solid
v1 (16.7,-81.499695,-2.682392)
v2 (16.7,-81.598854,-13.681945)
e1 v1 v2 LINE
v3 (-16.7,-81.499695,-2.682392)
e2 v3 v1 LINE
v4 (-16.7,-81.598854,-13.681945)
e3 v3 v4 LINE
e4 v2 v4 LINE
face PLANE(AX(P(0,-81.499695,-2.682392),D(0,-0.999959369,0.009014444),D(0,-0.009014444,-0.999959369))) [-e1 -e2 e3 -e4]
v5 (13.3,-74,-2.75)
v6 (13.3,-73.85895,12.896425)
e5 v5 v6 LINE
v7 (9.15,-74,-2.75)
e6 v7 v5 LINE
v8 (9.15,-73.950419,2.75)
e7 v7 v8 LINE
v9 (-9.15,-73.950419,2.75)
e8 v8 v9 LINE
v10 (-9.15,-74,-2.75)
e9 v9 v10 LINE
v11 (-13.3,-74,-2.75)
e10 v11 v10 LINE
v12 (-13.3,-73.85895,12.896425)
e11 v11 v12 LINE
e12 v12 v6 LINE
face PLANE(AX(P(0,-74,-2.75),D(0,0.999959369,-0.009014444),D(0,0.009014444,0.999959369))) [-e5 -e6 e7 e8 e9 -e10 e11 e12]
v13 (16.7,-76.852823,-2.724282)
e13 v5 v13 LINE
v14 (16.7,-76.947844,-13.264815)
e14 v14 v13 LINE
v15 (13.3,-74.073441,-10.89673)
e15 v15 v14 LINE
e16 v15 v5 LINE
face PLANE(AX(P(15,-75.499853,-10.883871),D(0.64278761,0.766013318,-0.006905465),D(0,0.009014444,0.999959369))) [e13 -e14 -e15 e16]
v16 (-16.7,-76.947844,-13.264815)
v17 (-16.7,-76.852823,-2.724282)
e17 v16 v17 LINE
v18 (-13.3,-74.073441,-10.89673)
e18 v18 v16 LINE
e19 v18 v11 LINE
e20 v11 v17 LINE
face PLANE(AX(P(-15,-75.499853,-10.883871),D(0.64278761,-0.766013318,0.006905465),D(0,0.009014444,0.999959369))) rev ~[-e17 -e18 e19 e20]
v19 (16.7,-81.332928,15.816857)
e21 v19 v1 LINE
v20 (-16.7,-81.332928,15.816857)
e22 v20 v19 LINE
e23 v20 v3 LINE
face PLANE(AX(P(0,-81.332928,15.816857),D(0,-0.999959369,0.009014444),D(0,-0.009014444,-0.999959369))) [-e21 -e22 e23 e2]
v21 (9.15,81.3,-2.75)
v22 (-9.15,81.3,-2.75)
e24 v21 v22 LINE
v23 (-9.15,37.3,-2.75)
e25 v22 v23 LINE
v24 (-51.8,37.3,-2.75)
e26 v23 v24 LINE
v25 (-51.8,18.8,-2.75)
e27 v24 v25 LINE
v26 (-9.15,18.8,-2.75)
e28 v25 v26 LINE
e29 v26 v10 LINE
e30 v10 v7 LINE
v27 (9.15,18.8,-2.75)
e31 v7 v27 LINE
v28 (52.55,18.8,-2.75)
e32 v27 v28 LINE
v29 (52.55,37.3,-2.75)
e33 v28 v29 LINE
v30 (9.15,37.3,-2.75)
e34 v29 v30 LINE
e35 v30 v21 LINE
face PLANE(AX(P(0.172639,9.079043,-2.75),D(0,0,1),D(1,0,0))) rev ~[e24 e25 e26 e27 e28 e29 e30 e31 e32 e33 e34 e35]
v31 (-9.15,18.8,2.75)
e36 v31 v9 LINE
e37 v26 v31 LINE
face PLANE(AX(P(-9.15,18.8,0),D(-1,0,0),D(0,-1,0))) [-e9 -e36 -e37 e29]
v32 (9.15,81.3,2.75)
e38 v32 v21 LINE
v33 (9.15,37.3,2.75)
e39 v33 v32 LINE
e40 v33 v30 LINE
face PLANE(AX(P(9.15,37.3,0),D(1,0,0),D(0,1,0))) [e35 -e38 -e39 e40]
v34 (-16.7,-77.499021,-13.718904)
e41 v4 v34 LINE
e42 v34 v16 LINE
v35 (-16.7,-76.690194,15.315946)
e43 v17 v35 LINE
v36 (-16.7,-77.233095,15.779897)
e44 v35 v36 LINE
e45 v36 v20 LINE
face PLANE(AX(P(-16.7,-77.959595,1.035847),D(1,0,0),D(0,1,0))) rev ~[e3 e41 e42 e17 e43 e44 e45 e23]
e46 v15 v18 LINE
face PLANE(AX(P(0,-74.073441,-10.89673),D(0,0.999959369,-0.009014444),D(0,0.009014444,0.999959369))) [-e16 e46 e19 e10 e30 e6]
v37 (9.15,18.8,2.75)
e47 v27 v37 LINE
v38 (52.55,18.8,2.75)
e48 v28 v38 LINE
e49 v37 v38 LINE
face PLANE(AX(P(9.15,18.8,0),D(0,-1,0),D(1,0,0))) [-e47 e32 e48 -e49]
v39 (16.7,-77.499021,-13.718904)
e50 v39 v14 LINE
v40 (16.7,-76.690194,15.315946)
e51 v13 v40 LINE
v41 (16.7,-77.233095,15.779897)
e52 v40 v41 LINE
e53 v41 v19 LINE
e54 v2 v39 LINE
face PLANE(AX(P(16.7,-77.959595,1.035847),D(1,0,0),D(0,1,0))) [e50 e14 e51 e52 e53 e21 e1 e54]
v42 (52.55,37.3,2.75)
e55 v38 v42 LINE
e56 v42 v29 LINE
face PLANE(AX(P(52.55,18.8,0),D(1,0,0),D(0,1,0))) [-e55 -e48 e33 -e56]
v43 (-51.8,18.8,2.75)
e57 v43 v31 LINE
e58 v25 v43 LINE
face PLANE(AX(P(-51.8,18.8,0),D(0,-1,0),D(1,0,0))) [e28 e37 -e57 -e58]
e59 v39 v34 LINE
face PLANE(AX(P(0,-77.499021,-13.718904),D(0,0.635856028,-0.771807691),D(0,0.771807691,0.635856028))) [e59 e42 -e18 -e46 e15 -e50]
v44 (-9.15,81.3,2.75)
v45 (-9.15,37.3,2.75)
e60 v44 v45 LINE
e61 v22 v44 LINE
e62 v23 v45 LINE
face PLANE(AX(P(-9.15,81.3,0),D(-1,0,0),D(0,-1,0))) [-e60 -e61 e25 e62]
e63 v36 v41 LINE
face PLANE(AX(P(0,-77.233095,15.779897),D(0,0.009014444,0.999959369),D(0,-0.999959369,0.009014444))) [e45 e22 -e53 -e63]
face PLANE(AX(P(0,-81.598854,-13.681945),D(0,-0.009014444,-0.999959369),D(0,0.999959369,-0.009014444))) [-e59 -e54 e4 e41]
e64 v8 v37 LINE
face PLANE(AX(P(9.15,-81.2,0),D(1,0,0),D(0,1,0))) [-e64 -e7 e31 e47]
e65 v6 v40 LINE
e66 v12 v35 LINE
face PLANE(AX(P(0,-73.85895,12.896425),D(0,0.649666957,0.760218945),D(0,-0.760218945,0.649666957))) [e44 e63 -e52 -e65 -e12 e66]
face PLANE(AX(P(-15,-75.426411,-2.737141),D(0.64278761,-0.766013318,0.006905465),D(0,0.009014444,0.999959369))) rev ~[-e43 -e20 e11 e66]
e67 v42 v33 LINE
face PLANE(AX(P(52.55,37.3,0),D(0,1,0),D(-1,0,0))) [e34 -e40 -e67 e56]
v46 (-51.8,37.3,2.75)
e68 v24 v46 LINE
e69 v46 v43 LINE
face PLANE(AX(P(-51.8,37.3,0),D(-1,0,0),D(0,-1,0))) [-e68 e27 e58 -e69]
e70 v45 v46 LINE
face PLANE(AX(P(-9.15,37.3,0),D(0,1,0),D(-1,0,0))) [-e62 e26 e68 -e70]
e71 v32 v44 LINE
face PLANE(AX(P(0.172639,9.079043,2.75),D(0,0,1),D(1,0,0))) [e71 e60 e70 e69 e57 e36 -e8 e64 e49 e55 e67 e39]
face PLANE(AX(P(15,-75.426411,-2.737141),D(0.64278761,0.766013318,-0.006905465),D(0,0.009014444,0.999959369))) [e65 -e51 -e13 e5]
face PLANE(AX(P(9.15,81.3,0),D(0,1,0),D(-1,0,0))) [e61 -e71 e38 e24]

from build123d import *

# Parameters (mm, degrees)
F1_DEPTH    = 2.75
F3_DEPTH    = 16.7
F4_C1_SIZE2 = 2.852938746
F4_C1_SIZE  = 3.4
F4_C2_SIZE2 = 2.852938746
F4_C2_SIZE  = 3.4


with BuildPart() as f1:
    # F0 (on Top) → F1 (new body, symmetric)
    with BuildSketch(Plane.XY):
        Polygon((9.15, 81.3), (0, 81.3), (-9.15, 81.3), (-9.15, 37.3), (-51.8, 37.3), (-51.8, 18.8), (-9.15, 18.8), (-9.15, -81.2), (0, -81.2), (9.15, -81.2), (9.15, 18.8), (52.55, 18.8), (52.55, 37.3), (9.15, 37.3), align=None)
    extrude(amount=F1_DEPTH, both=True)

    # F2 (on Right) → F3 (join, symmetric)
    with BuildSketch(Plane.YZ):
        Polygon((-74.0734412255, -10.8967302314), (-74, -2.75), (-73.8589504462, 12.8964254994), (-77.2330946452, 15.7798974367), (-81.3329280584, 15.8168566562), (-81.4996952681, -2.6823916718), (-81.5988541495, -13.6819447316), (-77.4990207363, -13.718903951), align=None)
    extrude(amount=F3_DEPTH, both=True)

    # F4: chamfer of 3.4 x 2.852938746 on 2 edges, made by hand

    # F4_c1
    f4_c1_edges = [f1.edges().sort_by_distance(p)[0] for p in [
        (-16.7, -73.9661958359, 0.999847634),
    ]]
    f4_c1_side = f1.faces().sort_by_distance((-16.6429412251, -73.9661958359, 0.999847634))[0]
    chamfer(f4_c1_edges, length=F4_C1_SIZE, length2=F4_C1_SIZE2, reference=f4_c1_side)

    # F4_c2
    f4_c2_edges = [f1.edges().sort_by_distance(p)[0] for p in [
        (16.7, -73.9661958359, 0.999847634),
    ]]
    f4_c2_side = f1.faces().sort_by_distance((16.6429412251, -73.9661958359, 0.999847634))[0]
    chamfer(f4_c2_edges, length=F4_C2_SIZE, length2=F4_C2_SIZE2, reference=f4_c2_side)


solid = f1.part
